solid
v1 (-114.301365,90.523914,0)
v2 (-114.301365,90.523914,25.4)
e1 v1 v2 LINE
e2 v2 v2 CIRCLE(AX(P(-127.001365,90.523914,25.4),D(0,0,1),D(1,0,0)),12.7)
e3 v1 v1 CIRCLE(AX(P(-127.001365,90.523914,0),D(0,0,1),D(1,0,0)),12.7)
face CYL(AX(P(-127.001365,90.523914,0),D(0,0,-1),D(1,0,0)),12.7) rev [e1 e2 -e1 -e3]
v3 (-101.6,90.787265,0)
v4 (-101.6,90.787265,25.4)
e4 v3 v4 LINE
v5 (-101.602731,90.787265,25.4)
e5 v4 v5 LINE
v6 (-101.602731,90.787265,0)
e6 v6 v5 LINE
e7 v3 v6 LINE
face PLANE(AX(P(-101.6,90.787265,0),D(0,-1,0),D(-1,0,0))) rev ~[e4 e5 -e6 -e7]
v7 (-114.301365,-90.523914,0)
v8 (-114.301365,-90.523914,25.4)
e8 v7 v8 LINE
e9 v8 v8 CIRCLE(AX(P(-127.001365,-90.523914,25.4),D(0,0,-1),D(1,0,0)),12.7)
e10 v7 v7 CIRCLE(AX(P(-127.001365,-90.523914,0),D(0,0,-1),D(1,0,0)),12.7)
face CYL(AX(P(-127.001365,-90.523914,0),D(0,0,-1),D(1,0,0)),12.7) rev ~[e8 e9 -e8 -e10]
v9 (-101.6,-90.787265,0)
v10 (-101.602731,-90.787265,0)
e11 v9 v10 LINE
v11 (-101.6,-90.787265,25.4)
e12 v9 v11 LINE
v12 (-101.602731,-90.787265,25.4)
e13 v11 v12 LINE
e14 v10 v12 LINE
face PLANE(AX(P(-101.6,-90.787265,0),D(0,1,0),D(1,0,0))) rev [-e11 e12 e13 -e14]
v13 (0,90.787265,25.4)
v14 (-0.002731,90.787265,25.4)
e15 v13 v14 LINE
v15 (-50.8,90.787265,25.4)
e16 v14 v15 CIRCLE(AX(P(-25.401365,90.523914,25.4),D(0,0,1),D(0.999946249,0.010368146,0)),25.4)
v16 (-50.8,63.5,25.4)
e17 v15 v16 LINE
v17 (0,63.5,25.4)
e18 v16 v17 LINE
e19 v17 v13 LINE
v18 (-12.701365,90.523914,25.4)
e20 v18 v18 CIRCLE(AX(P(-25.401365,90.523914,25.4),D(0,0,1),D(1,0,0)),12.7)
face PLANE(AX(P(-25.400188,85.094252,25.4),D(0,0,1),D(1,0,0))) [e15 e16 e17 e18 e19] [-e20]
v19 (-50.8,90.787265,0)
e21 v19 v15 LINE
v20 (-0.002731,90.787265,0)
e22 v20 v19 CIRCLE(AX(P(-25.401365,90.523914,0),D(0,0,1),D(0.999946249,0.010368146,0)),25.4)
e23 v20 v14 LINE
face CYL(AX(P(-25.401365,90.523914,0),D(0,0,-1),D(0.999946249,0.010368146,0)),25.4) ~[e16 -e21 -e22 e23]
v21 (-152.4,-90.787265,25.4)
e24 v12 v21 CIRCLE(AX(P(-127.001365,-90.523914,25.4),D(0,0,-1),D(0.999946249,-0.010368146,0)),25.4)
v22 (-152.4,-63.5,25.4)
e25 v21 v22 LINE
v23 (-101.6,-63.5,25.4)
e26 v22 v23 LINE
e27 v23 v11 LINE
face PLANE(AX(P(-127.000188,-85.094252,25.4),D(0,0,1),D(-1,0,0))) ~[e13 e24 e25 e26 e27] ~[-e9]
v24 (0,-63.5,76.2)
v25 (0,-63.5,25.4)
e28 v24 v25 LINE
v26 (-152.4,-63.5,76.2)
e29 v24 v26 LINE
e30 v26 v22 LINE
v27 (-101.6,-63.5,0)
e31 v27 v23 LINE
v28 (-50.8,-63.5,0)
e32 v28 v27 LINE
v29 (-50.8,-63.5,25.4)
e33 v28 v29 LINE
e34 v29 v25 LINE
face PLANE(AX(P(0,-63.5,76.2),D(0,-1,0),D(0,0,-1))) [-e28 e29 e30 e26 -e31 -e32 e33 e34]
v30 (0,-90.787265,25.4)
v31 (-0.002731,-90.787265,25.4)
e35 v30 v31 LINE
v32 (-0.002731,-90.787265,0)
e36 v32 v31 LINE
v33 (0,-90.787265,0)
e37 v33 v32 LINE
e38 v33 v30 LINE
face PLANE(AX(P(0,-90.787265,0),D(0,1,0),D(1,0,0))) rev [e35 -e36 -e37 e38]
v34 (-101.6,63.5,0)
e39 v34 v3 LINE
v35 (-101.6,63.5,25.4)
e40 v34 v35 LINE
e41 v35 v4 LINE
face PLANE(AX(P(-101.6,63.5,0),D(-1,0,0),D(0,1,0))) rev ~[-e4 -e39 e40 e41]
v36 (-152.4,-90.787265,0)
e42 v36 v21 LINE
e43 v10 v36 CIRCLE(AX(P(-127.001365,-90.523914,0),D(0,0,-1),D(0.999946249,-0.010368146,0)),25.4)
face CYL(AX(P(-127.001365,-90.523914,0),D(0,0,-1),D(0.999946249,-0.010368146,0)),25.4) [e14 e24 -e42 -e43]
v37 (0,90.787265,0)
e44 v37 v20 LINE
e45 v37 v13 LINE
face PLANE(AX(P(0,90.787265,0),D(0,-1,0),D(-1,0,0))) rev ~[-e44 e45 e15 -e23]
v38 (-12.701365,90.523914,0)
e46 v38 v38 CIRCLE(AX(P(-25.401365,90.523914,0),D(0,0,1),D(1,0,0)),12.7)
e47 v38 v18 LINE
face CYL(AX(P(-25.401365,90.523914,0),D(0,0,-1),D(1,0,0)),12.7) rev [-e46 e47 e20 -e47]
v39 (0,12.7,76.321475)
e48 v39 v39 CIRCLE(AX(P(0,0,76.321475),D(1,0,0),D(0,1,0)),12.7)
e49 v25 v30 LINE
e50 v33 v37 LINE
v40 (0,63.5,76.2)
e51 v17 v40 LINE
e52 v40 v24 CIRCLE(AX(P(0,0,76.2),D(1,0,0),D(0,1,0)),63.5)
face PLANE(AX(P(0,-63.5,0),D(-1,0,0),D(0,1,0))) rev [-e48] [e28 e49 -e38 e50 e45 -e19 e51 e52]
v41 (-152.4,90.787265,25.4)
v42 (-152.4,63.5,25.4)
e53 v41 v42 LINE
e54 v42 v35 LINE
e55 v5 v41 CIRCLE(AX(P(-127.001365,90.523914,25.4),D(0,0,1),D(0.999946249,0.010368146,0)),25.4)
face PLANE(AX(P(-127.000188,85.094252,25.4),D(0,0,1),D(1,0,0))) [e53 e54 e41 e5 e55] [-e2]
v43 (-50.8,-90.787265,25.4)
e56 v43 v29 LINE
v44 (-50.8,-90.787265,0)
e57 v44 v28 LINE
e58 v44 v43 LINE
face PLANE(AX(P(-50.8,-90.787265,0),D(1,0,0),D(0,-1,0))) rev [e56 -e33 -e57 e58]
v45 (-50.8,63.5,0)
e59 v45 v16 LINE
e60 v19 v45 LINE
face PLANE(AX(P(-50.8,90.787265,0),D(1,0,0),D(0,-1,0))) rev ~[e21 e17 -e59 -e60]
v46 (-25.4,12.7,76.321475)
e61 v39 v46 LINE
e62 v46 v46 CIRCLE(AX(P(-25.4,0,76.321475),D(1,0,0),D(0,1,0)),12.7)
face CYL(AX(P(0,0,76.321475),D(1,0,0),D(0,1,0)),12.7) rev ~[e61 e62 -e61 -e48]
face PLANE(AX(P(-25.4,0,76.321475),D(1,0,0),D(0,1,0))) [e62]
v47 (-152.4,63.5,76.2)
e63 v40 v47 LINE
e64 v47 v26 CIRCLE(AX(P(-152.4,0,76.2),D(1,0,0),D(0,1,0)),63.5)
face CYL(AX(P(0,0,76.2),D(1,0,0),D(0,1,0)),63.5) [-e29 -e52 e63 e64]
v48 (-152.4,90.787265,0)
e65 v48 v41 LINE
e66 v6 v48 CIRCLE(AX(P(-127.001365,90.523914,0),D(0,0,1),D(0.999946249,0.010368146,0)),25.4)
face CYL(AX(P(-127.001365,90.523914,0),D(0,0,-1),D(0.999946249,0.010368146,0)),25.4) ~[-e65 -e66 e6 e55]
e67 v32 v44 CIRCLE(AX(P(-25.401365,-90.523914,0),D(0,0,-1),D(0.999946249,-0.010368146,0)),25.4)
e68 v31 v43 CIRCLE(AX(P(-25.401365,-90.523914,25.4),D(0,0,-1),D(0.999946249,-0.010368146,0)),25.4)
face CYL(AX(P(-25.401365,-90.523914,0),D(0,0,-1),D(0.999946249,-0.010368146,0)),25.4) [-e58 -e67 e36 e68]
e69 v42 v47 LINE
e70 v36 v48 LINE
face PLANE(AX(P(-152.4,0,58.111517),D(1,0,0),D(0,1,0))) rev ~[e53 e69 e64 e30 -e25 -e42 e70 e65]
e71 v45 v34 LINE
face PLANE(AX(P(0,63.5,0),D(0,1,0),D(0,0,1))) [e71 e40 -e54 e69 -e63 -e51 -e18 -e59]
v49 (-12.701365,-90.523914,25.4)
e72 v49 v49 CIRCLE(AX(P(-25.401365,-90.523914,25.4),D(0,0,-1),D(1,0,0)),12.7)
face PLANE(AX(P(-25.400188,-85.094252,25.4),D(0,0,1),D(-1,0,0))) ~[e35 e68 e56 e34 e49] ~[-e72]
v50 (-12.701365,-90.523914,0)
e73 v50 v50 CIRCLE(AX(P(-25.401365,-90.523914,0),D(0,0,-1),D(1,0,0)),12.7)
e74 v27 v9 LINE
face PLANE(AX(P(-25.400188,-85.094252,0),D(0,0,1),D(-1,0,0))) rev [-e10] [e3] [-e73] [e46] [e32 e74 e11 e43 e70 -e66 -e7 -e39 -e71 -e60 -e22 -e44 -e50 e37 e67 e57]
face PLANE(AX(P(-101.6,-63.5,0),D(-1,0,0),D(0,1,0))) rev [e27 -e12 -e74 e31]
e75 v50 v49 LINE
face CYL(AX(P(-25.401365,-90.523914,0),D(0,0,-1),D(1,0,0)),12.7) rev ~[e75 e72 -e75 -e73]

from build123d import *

# Parameters (mm, degrees)
F1_DEPTH = 152.4
F3_R     = 12.7
F4_DEPTH = 25.4
F5_R     = 12.7
F6_DEPTH = 25.4


# Not quite as in the source:
# - a pattern or mirror of a feature is missing from the dataset's text; its kind, count and spacing are read off the source's solid


with BuildPart() as f1:
    # F0 (on Right) → F1 (new body)
    with BuildSketch(Plane.YZ):
        with BuildLine():
            Line((63.5, 12.7), (63.5, 76.2))
            ThreePointArc((63.5, 76.2), (0, 139.7), (-63.5, 76.2))
            Line((-63.5, 76.2), (-63.5, 12.7))
            Line((-63.5, 12.7), (-63.5, 0))
            Line((-63.5, 0), (63.5, 0))
            Line((63.5, 0), (63.5, 12.7))
        make_face()
    extrude(amount=-F1_DEPTH)

    # F3 (on Top) → F4 (join)
    with BuildSketch(Plane.XY):
        with BuildLine():
            Line((0, 90.7872649688), (-0.002730534, 90.7872649688))
            ThreePointArc((-0.002730534, 90.7872649688), (-25.401365267, 115.9239140637), (-50.8, 90.7872649688))
            Line((-50.8, 90.7872649688), (-50.8, 63.5))
            Line((-50.8, 63.5), (0, 63.5))
            Line((0, 63.5), (0, 90.7872649688))
        make_face()
        with Locations((-25.401365267, 90.5239140637)):
            Circle(F3_R, mode=Mode.SUBTRACT)
        with BuildLine():
            Line((-101.6, 90.7872649688), (-101.602730534, 90.7872649688))
            ThreePointArc((-101.602730534, 90.7872649688), (-127.001365267, 115.9239140637), (-152.4, 90.7872649688))
            Line((-152.4, 90.7872649688), (-152.4, 63.5))
            Line((-152.4, 63.5), (-101.6, 63.5))
            Line((-101.6, 63.5), (-101.6, 90.7872649688))
        make_face()
        with Locations((-127.001365267, 90.5239140637)):
            Circle(F3_R, mode=Mode.SUBTRACT)
    f4 = extrude(amount=F4_DEPTH)

    # F4_copies: F4 across plane
    add(f4.mirror(Plane(origin=(0, 0, 0), x_dir=(0, 0, -1), z_dir=(0, -1, 0))))

    # F5 (on face) → F6 (cut)
    with BuildSketch(Plane.YZ):
        with Locations((0, 76.3214752078)):
            Circle(F5_R)
    extrude(amount=-F6_DEPTH, mode=Mode.SUBTRACT)


solid = f1.part
